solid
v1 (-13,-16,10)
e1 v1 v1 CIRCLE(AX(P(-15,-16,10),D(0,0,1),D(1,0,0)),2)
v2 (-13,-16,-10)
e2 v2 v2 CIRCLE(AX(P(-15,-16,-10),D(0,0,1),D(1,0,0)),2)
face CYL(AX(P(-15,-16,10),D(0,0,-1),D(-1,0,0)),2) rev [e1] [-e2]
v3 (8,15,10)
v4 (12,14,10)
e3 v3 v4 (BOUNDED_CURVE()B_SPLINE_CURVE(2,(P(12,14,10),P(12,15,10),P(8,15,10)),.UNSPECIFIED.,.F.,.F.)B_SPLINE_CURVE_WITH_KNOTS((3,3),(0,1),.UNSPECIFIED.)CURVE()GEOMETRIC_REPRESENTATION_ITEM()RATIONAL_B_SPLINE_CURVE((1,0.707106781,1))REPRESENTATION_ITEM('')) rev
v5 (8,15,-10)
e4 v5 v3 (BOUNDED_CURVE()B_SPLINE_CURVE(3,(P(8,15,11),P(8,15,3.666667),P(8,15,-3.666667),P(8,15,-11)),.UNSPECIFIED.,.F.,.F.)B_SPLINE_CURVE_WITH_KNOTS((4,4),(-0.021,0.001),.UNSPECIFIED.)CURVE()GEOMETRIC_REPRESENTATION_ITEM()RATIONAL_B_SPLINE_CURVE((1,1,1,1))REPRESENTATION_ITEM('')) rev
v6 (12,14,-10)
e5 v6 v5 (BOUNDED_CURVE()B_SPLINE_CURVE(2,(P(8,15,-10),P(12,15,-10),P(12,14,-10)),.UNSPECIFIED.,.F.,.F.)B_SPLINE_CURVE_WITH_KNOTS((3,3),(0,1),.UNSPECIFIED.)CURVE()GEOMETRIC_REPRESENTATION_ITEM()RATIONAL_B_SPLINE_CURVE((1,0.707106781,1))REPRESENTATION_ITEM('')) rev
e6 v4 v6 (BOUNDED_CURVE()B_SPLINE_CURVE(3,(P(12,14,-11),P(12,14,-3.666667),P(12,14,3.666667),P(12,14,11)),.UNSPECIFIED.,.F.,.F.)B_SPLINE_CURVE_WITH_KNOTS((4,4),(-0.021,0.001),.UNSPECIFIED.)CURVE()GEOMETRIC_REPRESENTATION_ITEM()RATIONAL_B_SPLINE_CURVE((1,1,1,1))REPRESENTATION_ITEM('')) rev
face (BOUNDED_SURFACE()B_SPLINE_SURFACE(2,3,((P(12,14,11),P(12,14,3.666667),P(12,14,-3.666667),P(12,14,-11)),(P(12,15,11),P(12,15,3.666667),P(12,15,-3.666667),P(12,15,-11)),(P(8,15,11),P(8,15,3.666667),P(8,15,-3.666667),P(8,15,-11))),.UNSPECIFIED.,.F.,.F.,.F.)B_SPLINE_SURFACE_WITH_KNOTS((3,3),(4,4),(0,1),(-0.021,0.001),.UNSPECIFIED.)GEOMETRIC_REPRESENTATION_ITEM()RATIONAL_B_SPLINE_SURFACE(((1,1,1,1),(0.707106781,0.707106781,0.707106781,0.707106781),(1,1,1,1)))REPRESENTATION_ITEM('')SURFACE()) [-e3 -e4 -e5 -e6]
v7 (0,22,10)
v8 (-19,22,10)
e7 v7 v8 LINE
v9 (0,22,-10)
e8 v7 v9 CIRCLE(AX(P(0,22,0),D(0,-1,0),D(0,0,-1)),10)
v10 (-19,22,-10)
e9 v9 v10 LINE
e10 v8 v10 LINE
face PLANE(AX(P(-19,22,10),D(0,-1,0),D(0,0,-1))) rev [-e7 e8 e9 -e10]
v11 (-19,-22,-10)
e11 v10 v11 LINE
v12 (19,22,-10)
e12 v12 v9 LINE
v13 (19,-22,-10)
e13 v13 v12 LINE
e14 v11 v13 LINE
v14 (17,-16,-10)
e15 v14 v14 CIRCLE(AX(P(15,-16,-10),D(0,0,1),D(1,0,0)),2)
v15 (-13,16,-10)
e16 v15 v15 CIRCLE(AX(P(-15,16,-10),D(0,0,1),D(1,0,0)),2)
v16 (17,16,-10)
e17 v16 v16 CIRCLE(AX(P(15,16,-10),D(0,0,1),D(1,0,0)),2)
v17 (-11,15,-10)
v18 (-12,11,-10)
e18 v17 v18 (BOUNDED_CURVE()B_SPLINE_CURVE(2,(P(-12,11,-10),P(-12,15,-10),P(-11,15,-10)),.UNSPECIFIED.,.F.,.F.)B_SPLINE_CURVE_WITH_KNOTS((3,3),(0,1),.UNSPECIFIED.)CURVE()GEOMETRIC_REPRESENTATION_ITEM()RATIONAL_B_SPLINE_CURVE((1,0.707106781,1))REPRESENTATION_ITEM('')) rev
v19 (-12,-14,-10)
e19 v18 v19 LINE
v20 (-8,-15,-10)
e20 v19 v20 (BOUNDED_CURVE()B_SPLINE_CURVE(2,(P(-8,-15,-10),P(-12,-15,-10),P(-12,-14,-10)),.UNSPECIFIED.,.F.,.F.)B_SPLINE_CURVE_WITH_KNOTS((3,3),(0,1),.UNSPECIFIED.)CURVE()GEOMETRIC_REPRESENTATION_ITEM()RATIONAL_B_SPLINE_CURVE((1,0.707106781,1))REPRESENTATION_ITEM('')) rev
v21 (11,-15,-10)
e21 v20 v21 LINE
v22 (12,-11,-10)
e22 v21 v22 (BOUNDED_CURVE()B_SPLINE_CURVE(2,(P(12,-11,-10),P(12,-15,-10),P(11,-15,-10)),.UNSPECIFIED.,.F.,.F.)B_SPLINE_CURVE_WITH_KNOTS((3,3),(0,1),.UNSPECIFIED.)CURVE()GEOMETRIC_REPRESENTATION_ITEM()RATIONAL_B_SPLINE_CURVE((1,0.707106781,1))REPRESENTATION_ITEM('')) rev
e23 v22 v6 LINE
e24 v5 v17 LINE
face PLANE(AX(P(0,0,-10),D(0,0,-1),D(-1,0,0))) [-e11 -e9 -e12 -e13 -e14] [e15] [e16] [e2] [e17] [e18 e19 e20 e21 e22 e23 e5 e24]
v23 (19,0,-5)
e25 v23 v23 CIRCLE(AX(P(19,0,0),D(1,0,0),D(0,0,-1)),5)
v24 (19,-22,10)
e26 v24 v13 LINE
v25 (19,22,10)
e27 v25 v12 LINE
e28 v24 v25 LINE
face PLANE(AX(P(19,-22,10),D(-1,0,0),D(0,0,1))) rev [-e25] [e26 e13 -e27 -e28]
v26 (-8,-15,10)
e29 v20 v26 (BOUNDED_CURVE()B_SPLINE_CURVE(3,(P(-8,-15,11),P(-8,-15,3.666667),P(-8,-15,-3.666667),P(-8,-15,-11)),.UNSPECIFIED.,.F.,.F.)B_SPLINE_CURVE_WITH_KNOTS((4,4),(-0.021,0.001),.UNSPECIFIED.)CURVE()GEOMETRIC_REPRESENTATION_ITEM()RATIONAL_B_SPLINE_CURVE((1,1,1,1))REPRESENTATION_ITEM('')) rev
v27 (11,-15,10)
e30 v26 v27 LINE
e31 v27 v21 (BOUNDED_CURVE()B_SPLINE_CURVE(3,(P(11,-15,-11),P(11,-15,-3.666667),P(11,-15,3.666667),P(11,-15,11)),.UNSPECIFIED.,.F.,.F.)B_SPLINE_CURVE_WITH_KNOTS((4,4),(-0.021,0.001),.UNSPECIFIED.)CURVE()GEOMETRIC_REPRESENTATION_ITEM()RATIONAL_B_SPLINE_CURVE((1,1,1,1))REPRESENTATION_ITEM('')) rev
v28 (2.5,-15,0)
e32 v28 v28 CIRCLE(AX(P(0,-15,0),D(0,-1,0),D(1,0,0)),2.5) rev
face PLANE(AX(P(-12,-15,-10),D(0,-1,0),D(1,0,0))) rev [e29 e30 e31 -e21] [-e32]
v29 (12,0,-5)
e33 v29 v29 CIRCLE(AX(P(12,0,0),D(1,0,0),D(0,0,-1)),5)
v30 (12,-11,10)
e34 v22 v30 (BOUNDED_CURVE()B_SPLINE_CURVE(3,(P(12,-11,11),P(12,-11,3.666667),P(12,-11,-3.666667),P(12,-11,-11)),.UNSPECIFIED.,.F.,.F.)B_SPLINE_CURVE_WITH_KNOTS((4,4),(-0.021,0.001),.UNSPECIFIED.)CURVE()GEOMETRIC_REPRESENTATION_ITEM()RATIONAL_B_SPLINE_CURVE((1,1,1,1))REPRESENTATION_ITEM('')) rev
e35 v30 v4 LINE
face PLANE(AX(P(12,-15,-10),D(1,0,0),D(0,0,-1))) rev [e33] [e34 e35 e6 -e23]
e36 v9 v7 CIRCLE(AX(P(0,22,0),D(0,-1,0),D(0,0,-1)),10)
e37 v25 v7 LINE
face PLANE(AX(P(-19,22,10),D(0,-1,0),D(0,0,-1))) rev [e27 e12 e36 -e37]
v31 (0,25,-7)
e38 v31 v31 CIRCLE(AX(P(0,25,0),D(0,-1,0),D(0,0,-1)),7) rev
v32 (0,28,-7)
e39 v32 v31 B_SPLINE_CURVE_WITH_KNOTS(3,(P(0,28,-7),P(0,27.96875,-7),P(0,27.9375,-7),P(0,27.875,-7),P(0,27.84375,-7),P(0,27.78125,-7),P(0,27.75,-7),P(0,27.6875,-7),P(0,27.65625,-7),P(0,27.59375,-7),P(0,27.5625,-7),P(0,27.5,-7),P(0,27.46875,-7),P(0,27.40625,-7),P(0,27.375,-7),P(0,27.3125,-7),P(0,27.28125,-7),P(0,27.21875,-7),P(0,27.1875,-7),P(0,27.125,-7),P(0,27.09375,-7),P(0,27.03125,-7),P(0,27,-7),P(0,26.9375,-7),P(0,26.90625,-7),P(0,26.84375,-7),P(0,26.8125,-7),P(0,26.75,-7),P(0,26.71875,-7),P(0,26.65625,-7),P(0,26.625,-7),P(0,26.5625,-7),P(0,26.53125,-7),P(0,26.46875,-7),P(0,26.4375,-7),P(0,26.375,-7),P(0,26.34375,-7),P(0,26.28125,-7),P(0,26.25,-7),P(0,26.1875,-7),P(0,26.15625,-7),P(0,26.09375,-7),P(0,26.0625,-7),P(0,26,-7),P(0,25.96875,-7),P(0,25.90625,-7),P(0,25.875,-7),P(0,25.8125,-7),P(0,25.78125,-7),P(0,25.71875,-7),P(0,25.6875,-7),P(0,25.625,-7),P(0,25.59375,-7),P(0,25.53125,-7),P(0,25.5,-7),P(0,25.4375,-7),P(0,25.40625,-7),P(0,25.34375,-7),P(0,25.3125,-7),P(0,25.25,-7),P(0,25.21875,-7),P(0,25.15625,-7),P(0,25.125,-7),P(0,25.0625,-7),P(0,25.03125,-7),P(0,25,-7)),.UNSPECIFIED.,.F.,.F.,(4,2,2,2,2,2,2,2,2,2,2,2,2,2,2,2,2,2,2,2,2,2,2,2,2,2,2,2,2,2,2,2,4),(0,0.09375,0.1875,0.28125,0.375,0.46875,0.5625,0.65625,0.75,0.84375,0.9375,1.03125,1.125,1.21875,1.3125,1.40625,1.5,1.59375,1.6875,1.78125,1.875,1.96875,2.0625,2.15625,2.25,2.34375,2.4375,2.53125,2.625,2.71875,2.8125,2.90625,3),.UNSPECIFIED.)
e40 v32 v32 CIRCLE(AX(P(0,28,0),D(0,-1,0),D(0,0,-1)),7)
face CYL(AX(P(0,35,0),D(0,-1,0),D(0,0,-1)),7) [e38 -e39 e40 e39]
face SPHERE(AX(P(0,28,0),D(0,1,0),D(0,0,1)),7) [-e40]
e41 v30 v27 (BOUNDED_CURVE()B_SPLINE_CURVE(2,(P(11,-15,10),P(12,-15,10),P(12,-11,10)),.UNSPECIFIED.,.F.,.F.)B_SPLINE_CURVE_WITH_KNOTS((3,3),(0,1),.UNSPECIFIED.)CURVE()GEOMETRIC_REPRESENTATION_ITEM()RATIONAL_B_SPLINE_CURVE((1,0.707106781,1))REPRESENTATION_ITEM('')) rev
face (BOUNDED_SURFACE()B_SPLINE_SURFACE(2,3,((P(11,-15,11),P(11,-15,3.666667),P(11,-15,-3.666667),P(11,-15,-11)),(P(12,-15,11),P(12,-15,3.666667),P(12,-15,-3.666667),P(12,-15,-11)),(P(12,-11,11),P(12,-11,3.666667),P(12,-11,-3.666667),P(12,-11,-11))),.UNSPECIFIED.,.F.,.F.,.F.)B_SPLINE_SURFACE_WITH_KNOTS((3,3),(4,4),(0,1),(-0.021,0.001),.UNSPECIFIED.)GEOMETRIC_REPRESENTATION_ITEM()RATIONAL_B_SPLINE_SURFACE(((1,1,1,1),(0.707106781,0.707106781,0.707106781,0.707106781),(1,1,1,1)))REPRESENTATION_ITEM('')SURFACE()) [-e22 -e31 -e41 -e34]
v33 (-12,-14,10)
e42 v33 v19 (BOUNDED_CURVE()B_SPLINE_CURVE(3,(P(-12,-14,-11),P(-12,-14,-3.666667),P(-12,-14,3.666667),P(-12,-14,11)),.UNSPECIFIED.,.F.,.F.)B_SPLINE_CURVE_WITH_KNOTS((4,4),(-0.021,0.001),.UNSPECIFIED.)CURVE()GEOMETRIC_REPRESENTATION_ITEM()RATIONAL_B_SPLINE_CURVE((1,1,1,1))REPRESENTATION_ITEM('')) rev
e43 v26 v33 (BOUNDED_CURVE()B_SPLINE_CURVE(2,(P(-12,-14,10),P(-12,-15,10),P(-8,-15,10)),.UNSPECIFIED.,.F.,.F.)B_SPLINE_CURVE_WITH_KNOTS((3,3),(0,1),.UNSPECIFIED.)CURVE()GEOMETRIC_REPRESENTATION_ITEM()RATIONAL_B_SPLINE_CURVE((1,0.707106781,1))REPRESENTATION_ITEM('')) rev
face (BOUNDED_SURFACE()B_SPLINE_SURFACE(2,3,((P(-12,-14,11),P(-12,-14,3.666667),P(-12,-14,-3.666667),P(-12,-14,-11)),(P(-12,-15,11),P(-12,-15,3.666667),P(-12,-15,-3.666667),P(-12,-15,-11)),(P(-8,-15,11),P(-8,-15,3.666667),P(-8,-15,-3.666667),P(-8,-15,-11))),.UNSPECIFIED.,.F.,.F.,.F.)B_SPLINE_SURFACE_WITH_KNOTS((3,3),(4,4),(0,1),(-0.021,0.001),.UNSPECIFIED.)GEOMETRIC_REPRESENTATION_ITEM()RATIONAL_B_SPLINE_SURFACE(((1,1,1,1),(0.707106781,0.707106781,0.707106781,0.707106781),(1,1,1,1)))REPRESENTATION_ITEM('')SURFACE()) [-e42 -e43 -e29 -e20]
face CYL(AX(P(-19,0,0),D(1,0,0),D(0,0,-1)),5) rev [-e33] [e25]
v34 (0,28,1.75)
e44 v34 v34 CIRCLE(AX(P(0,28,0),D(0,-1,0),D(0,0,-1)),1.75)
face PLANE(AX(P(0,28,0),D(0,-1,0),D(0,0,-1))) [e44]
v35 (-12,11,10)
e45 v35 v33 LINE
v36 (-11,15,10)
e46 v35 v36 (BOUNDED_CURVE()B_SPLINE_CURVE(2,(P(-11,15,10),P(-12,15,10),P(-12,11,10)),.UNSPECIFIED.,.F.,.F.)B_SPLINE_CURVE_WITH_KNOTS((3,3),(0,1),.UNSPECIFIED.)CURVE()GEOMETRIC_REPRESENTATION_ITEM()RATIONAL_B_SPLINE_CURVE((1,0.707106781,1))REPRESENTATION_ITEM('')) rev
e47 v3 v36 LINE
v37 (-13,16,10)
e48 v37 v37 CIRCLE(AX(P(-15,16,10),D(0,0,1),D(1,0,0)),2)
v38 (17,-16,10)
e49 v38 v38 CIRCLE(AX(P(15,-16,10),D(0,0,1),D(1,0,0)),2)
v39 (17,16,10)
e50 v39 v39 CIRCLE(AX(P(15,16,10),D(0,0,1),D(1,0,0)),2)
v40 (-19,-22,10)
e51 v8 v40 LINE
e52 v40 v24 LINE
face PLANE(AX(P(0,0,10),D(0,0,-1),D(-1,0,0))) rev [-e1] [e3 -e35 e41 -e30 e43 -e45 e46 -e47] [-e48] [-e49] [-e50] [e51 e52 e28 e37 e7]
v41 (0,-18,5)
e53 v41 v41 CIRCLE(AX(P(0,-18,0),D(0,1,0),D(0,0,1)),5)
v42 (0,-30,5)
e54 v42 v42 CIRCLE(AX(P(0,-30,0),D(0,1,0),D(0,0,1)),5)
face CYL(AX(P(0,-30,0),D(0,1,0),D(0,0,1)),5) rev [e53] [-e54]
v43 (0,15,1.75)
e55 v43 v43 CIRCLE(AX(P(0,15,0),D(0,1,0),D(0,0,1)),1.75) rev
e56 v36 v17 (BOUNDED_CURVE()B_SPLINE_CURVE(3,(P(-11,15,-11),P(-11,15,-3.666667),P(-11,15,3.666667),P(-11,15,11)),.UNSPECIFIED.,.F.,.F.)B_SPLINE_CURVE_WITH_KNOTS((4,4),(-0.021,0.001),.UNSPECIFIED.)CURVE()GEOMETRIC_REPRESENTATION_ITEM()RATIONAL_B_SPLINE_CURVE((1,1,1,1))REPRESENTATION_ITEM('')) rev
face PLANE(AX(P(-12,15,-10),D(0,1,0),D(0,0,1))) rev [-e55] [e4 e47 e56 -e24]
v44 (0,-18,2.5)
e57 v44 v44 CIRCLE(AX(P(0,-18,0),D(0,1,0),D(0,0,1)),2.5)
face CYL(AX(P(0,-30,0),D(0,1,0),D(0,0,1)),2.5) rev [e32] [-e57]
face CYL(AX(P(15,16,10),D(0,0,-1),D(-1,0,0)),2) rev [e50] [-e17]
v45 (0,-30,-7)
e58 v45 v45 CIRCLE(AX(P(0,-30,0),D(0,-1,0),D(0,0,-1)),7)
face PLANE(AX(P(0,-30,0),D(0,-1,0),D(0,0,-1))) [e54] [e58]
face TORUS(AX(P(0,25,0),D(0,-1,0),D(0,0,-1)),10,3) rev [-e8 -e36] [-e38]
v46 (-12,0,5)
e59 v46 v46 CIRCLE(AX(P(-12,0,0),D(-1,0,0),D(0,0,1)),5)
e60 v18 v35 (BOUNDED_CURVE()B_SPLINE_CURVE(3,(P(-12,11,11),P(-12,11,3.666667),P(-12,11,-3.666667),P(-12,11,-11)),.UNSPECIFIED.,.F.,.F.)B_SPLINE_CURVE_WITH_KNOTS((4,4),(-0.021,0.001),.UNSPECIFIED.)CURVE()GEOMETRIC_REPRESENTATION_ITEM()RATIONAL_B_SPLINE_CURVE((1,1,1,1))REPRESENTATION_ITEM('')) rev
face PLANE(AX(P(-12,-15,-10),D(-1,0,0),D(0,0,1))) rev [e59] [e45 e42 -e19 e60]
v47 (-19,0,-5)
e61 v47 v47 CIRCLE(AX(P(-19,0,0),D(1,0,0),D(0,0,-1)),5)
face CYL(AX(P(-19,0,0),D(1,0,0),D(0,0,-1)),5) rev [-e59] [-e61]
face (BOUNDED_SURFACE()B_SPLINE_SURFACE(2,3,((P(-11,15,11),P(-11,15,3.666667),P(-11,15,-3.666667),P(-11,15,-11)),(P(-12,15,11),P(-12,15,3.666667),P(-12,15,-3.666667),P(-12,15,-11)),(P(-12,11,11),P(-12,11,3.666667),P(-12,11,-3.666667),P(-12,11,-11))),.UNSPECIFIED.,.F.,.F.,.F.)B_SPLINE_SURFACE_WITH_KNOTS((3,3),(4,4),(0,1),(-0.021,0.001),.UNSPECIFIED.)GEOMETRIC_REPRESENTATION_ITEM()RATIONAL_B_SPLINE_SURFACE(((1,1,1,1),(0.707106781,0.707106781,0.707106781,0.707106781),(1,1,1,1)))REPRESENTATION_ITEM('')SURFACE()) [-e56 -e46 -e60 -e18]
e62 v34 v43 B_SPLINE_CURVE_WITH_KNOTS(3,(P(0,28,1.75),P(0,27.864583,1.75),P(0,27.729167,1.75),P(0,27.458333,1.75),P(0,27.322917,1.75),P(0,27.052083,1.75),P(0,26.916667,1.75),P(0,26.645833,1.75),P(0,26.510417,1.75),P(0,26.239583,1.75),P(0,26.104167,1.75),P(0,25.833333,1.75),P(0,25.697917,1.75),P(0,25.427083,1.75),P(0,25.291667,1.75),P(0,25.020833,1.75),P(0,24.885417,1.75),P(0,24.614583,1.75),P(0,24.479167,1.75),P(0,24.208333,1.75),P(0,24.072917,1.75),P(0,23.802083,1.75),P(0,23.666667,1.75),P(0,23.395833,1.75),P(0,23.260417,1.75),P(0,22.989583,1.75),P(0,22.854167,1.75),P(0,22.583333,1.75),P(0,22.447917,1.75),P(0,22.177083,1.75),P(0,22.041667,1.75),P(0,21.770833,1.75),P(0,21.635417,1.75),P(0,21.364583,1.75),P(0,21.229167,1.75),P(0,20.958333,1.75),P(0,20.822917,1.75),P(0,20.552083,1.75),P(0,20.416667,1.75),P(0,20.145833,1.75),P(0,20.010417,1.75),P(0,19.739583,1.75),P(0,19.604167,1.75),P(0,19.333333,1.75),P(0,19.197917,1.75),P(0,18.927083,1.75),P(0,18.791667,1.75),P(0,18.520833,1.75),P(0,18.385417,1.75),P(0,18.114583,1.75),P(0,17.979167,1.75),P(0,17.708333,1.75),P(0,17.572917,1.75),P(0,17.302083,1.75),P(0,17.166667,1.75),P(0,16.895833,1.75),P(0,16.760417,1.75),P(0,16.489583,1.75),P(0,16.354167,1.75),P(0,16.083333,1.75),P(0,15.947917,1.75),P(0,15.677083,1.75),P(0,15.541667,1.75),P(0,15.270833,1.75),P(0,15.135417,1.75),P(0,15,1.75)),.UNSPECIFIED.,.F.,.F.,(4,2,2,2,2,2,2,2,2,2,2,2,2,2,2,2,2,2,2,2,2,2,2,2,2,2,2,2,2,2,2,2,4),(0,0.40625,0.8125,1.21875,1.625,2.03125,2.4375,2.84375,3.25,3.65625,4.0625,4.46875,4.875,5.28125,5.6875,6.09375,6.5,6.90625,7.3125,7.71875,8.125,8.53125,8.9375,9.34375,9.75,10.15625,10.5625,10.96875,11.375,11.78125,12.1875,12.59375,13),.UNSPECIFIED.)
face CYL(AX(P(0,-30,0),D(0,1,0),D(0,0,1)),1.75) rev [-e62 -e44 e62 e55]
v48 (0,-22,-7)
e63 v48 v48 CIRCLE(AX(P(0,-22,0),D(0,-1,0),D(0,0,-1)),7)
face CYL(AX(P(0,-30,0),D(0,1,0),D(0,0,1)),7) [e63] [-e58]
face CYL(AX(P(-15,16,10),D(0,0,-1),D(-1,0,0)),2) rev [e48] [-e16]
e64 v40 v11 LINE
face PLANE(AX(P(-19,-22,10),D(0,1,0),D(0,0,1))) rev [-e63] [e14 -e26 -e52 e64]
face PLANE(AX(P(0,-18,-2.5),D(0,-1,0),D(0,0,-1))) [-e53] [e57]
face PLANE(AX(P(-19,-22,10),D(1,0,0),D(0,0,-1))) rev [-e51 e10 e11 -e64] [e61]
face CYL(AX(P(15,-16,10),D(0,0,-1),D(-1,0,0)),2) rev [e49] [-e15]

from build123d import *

# Parameters (mm, degrees)
SKETCH1_W               = 38
SKETCH1_H               = 44
SKETCH1_R               = 2
BOSS_EXTRUDE1_DEPTH     = 10
SKETCH2_R               = 7
BOSS_EXTRUDE2_DEPTH     = 13
FILLET1_R               = 3
FILLET2_R               = 7
CUT_EXTRUDE1_DEPTH      = 42.060930335
CUT_EXTRUDE1_DEPTH_BACK = 42.060930335
SKETCH3_W               = 24
SKETCH3_H               = 30
BOSS_EXTRUDE3_START     = 8
SKETCH4_R               = 7
BOSS_EXTRUDE3_DEPTH     = 8
CUT_EXTRUDE2_DEPTH      = 42.060930335
CUT_EXTRUDE2_DEPTH_BACK = 42.060930335
SKETCH8_R               = 5
CUT_EXTRUDE3_DEPTH      = 50.859803449
CUT_EXTRUDE3_DEPTH_BACK = 13
SKETCH9_R               = 1.75
FILLET3_SIZE            = 4
FILLET3_SIZE_2          = 1


# Some blends are built 0.0001 mm under size
with BuildPart() as part:
    # Sketch1 → Boss-Extrude1 (new, symmetric)
    with BuildSketch(Plane.XY):
        Rectangle(SKETCH1_W, SKETCH1_H)
        with Locations((-15, 16)):
            Circle(SKETCH1_R, mode=Mode.SUBTRACT)
        with Locations((15, 16)):
            Circle(SKETCH1_R, mode=Mode.SUBTRACT)
        with Locations((15, -16)):
            Circle(SKETCH1_R, mode=Mode.SUBTRACT)
        with Locations((-15, -16)):
            Circle(SKETCH1_R, mode=Mode.SUBTRACT)
    extrude(amount=BOSS_EXTRUDE1_DEPTH, both=True)

    # Sketch2 → Boss-Extrude2 (add)
    with BuildSketch(Plane(origin=(0, 22, 0), x_dir=(1, 0, 0), z_dir=(0, 1, 0))):
        with Locations(Location((0, 0, 0), (0, 0, 90))):
            Circle(SKETCH2_R)
    extrude(amount=BOSS_EXTRUDE2_DEPTH)

    # Fillet1
    fillet1_edges = [part.edges().sort_by_distance(p)[0] for p in [
        (0, 22, 7),
    ]]
    fillet(fillet1_edges, radius=FILLET1_R - 0.0001)  # a hair under: the kernel refuses the full size

    # Fillet2
    fillet2_edges = [part.edges().sort_by_distance(p)[0] for p in [
        (0, 35, 7),
    ]]
    fillet(fillet2_edges, radius=FILLET2_R)

    # Sketch3 → Cut-Extrude1 (cut, two sides: drawn at the far end of the back side and taken through both)
    with BuildSketch(Plane.XY.offset(-CUT_EXTRUDE1_DEPTH_BACK)):
        Rectangle(SKETCH3_W, SKETCH3_H)
    extrude(amount=CUT_EXTRUDE1_DEPTH + CUT_EXTRUDE1_DEPTH_BACK, mode=Mode.SUBTRACT)

    # Sketch4 → Boss-Extrude3 (add)
    with BuildSketch(Plane.XZ.offset(22).offset(BOSS_EXTRUDE3_START)):
        with Locations(Location((0, 0, 0), (0, 0, 270))):
            Circle(SKETCH4_R)
    extrude(amount=-BOSS_EXTRUDE3_DEPTH)

    # Sketch7 → Cut-Revolve1 (revolve, cut)
    with BuildSketch(Plane(origin=(0, 0, 0), x_dir=(0, 0, -1), z_dir=(1, 0, 0)), mode=Mode.PRIVATE) as cut_revolve1_sk:
        Polygon((0, -30), (0, -12.56), (2.5, -12.56), (2.5, -18), (5, -18), (5, -30), align=None)
    revolve(cut_revolve1_sk.sketch.rotate(Axis((0, -30, 0), (0, -1, 0)), 180), axis=Axis((0, -30, 0), (0, -1, 0)), mode=Mode.SUBTRACT)

    # Sketch8 → Cut-Extrude2 (cut, two sides: drawn at the far end of the back side and taken through both)
    with BuildSketch(Plane(origin=(0, 0, 0), x_dir=(0, 0, -1), z_dir=(1, 0, 0)).offset(-CUT_EXTRUDE2_DEPTH_BACK)):
        Circle(SKETCH8_R)
    extrude(amount=CUT_EXTRUDE2_DEPTH + CUT_EXTRUDE2_DEPTH_BACK, mode=Mode.SUBTRACT)

    # Sketch9 → Cut-Extrude3 (cut, two sides: drawn at the far end of the back side and taken through both)
    with BuildSketch(Plane.XZ.offset(-15).offset(-CUT_EXTRUDE3_DEPTH_BACK)):
        with Locations(Location((0, 0, 0), (0, 0, 90))):
            Circle(SKETCH9_R)
    extrude(amount=CUT_EXTRUDE3_DEPTH + CUT_EXTRUDE3_DEPTH_BACK, mode=Mode.SUBTRACT)

    # Fillet3
    # an asymmetric fillet: 4, 1 mm, written as the material it adds along each edge
    with BuildSketch(Plane(origin=(12, -15, -10), x_dir=(0, 1, 0), z_dir=(0, 0, 1))) as fillet3_piece_1:
        with BuildLine():
            Bezier((FILLET3_SIZE, 0), (0, 0), (0, FILLET3_SIZE_2), weights=[1, 0.707106781, 1])
            Line((0, FILLET3_SIZE_2), (0, 0))
            Line((0, 0), (FILLET3_SIZE, 0))
        make_face()
    extrude(amount=20)
    with BuildSketch(Plane(origin=(12, 15, -10), x_dir=(0, -1, 0), z_dir=(0, 0, 1))) as fillet3_piece_2:
        with BuildLine():
            Bezier((FILLET3_SIZE_2, 0), (0, 0), (0, -FILLET3_SIZE), weights=[1, 0.707106781, 1])
            Line((0, -FILLET3_SIZE), (0, 0))
            Line((0, 0), (FILLET3_SIZE_2, 0))
        make_face()
    extrude(amount=20)
    with BuildSketch(Plane(origin=(-12, -15, 10), x_dir=(0, 1, 0), z_dir=(0, 0, -1)), Plane(origin=(-12, 15, 10), x_dir=(1, 0, 0), z_dir=(0, 0, -1))) as fillet3_piece_3:
        with BuildLine():
            Bezier((FILLET3_SIZE_2, 0), (0, 0), (0, FILLET3_SIZE), weights=[1, 0.707106781, 1])
            Line((0, FILLET3_SIZE), (0, 0))
            Line((0, 0), (FILLET3_SIZE_2, 0))
        make_face()
    extrude(amount=20)


solid = part.part
